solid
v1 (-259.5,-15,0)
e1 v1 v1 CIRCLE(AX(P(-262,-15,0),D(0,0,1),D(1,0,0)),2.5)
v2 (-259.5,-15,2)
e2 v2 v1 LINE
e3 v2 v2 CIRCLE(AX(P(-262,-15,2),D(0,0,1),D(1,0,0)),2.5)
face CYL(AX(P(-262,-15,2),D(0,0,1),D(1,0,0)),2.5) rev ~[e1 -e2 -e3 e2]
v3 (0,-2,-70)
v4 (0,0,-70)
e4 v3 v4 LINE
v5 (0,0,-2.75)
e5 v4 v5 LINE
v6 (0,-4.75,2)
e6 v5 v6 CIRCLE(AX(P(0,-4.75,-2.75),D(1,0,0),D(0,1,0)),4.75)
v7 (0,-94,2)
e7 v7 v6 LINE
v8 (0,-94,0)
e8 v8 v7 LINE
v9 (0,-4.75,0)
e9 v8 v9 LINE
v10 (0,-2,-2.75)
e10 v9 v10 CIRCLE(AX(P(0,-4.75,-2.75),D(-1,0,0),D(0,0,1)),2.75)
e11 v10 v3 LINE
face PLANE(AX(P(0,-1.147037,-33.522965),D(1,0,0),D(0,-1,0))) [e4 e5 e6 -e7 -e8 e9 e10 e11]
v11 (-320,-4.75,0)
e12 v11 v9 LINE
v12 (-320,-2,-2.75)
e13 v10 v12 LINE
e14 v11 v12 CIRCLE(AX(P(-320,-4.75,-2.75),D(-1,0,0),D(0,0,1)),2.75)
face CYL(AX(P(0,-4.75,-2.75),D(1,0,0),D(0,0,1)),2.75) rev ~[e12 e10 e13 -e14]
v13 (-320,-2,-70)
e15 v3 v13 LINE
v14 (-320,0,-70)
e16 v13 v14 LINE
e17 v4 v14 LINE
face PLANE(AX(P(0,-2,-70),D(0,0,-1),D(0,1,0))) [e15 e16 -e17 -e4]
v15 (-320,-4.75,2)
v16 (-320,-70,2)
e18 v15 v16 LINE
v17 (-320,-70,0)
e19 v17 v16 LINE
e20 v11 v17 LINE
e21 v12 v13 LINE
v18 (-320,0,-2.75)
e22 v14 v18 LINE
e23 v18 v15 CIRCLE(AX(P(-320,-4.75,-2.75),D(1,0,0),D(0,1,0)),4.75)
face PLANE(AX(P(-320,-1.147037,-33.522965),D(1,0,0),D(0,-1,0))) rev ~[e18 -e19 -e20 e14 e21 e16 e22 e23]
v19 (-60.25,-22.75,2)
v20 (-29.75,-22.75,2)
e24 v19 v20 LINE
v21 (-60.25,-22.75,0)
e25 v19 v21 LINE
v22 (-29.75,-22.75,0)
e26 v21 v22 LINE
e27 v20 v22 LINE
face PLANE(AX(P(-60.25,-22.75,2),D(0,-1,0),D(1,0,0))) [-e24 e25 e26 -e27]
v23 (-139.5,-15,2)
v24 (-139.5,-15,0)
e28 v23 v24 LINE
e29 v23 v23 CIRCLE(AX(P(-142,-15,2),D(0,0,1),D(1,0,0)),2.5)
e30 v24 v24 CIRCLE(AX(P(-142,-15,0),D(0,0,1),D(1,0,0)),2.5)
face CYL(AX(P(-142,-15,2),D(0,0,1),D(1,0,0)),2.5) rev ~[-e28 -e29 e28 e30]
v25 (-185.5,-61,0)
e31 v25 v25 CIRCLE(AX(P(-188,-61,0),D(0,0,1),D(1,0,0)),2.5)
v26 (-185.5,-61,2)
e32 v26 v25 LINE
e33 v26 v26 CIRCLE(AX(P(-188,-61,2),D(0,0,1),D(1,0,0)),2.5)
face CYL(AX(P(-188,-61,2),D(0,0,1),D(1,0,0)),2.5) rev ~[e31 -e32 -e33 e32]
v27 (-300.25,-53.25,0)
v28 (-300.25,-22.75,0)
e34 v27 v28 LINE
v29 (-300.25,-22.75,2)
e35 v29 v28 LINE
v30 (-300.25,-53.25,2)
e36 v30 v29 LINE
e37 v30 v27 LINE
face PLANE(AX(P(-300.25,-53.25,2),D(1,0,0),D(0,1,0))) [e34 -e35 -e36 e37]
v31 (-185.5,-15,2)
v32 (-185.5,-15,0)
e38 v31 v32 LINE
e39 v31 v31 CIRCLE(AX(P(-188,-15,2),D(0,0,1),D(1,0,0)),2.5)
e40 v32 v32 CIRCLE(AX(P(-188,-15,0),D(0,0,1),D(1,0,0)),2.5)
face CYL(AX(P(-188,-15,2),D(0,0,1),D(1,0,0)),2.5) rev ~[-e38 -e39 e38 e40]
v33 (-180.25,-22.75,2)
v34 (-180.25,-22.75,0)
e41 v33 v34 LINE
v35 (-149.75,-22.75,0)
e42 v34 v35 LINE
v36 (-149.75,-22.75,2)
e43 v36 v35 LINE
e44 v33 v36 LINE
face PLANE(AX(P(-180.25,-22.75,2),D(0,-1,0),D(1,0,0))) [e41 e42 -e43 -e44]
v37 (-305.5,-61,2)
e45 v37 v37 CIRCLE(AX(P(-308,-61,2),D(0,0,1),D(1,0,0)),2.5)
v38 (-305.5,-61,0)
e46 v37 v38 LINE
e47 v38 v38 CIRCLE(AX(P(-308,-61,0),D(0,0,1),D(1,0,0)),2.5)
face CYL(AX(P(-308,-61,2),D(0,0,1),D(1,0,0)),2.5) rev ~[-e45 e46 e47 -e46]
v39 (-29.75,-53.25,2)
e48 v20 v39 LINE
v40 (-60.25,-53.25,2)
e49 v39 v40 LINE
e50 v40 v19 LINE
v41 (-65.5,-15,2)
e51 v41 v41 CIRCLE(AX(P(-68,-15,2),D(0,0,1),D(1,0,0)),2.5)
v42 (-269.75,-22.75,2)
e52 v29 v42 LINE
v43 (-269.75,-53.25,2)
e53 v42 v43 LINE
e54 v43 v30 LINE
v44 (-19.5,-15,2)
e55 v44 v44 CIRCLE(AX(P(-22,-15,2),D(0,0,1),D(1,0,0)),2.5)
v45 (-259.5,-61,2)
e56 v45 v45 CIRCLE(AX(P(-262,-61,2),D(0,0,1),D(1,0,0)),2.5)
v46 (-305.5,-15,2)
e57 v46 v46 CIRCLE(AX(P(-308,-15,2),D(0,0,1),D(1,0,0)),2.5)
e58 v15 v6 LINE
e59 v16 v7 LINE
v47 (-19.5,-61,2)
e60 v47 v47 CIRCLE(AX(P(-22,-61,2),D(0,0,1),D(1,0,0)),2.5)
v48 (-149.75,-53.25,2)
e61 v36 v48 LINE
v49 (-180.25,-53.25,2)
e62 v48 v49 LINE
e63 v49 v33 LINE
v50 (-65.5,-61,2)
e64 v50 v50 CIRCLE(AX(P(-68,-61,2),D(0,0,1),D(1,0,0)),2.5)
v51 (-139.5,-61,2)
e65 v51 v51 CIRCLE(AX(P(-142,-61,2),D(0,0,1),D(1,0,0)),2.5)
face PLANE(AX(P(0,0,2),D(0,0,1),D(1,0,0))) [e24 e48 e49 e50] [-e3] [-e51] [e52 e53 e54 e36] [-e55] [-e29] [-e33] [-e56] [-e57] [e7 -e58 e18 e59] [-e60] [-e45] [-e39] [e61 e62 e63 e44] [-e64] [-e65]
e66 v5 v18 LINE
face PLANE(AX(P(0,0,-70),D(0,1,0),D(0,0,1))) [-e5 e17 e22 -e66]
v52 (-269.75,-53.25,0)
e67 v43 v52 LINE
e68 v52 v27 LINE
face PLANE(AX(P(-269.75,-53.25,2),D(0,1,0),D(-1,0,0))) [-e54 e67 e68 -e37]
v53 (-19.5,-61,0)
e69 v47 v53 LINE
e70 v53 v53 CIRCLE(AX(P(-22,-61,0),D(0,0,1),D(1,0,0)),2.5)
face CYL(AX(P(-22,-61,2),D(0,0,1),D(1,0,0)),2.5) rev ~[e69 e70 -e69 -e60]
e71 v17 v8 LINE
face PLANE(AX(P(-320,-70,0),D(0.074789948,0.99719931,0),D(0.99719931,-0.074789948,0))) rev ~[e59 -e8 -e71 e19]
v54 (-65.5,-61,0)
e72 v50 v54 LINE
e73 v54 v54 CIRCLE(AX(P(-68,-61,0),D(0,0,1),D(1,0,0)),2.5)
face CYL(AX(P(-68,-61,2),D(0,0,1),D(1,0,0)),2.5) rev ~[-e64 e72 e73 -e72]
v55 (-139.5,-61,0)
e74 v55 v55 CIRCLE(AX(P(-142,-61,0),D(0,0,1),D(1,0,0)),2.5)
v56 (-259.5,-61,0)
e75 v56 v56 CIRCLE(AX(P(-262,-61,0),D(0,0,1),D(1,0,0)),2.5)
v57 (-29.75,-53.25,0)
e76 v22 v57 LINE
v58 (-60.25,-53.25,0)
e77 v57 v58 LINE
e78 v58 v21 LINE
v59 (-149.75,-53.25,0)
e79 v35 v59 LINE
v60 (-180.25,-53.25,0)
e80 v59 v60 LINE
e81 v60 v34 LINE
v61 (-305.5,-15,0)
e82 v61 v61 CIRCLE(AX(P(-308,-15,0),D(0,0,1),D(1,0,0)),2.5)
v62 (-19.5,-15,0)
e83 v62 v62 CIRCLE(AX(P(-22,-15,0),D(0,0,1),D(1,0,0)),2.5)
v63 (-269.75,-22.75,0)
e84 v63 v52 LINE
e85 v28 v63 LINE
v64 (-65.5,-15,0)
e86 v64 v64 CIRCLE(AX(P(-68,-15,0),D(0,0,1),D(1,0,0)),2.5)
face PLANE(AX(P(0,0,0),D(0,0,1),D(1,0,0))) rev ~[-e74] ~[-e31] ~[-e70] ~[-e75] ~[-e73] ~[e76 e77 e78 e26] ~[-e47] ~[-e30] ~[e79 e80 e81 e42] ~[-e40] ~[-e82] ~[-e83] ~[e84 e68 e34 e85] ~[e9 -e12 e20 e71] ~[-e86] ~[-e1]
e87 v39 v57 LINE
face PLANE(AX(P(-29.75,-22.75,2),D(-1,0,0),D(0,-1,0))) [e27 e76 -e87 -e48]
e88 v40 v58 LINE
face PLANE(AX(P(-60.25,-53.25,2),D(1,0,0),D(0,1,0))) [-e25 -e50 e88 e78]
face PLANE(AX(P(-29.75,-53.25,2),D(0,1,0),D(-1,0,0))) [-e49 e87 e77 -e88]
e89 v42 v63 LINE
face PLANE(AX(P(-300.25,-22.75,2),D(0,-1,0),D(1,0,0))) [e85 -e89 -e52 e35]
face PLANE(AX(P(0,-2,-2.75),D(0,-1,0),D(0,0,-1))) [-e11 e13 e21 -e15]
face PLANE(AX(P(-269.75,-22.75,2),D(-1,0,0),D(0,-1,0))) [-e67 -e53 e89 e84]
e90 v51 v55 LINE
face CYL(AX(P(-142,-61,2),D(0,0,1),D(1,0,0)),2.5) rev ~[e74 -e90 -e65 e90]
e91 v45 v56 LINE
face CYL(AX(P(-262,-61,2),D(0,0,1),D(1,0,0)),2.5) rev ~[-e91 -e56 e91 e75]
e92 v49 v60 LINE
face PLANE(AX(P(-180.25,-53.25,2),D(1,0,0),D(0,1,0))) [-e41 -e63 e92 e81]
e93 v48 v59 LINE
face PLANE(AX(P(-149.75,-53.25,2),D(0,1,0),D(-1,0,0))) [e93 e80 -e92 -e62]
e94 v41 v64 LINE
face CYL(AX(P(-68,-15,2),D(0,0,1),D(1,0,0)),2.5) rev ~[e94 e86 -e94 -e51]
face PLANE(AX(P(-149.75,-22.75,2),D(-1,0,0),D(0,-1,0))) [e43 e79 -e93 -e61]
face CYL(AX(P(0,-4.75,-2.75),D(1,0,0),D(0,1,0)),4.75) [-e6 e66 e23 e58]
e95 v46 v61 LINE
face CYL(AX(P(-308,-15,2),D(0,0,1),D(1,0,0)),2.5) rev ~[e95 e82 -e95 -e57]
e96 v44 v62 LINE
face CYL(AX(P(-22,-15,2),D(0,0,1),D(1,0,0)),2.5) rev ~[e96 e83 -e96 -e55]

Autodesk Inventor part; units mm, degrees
ref_plane "YZ Plane" through (0, 0, 0) normal (1, 0, 0) x (0, 1, 0)
ref_plane "XZ Plane" through (0, 0, 0) normal (0, 1, 0) x (-1, 0, 0)
ref_plane "XY Plane" through (0, 0, 0) normal (0, 0, 1) x (1, 0, 0)
sketch "Sketch1" plane through (0, 0, 0) normal (0, 0, 1) x (1, 0, 0)
  line L0 (0, 0) -> (-320, 0)
  line L1 (0, -94) -> (0, 0)
  line L2 (-320, 0) -> (-320, -70)
  line L3 (-320, -70) -> (0, -94)
  point P0 (0, -47)
  dimension "d32" = 94
  dimension "d60" = 70
  dimension "d61" = 320
extrude "Plate1" add sketch "Sketch1" along normal blind 2
sketch "Sketch8" plane through (0, 0, 2) normal (0, 0, 1) x (1, 0, 0)
  line L0 (-29.75, -53.25) -> (-60.25, -53.25)
  line L1 (-60.25, -53.25) -> (-60.25, -22.75)
  line L2 (-60.25, -22.75) -> (-29.75, -22.75)
  line L3 (-29.75, -22.75) -> (-29.75, -53.25)
  line L4 (-29.75, -53.25) -> (-60.25, -22.75) construction
  line L5 (-60.25, -53.25) -> (-29.75, -22.75) construction
  circle A0 centre (-22, -61) radius 2.5
  circle A1 centre (-68, -61) radius 2.5
  circle A2 centre (-68, -15) radius 2.5
  circle A3 centre (-22, -15) radius 2.5
  line L6 (0, 0) -> (0, -94) projected
  line L7 (-320, 0) -> (0, 0) projected
  line L8 (-60.25, -53.25) -> (-68, -61) construction
  line L9 (-68, -15) -> (-22, -15) construction
  line L10 (-22, -15) -> (-22, -61) construction
  line L11 (-22, -61) -> (-68, -61) construction
  line L12 (-68, -61) -> (-68, -15) construction
  point P0 (-45, -38)
  dimension "d51" = 30.5
  dimension "d52" = 30.5
  dimension "d53" = 5
  dimension "d72" = 45
  dimension "d78" = 46
  dimension "d79" = 15
extrude "Cut3" cut sketch "Sketch8" against normal blind 2
pattern_linear "Rectangular Pattern1" count 3 spacing 120 along (-1, 0, 0) of "Cut3"
sketch "Sketch9" plane through (0, -2, 2) normal (0, 1, 0) x (-1, 0, 0)
  line L0 (320, 0) -> (0, 0)
  line L1 (0, 0) -> (0, -72)
  line L2 (0, -72) -> (320, -72)
  line L3 (320, -72) -> (320, 0)
edge flange "Flange3" height 72 angle 90 thickness 2 bend radius 2.75 thickness toward (0, 1, 0) relief round relief width 2 relief depth 1 edges at (-160, 0, 0) wall of the first edge with corners at (-320, -2, 2) (0, -2, 2) (0, -2, -70) (-320, -2, -70)
bend "Bend3"
corner "Corner3"
equation "\"d51\" = d52"
equation "\"d55\" = Thickness"
equation "\"d2\" = Thickness"
equation "\"d62\" = BendReliefWidth"
equation "\"d63\" = BendReliefDepth"
equation "\"d64\" = MinimumRemnant"
equation "\"d65\" = TransitionRadius"
equation "\"d68\" = BendRadius"
equation "\"d69\" = CornerReliefSize"
equation "\"d70\" = GapSize"
equation "\"d71\" = JacobiRadiusSize"
equation "\"BendReliefWidth\" = Thickness"
equation "\"BendReliefDepth\" = 0.5 * Thickness"
equation "\"CornerReliefSize\" = 4 * Thickness"
equation "\"MinimumRemnant\" = 2 * Thickness"
equation "\"TransitionRadius\" = BendRadius"
equation "\"JacobiRadiusSize\" = BendRadius"
equation "\"GapSize\" = Thickness"
equation "\"Thickness\" = 2"
equation "\"BendRadius\" = 2.75"
properties part number "PRS 8422 BOTTOM FDS diameter way up_940" material "Stainless Steel"
